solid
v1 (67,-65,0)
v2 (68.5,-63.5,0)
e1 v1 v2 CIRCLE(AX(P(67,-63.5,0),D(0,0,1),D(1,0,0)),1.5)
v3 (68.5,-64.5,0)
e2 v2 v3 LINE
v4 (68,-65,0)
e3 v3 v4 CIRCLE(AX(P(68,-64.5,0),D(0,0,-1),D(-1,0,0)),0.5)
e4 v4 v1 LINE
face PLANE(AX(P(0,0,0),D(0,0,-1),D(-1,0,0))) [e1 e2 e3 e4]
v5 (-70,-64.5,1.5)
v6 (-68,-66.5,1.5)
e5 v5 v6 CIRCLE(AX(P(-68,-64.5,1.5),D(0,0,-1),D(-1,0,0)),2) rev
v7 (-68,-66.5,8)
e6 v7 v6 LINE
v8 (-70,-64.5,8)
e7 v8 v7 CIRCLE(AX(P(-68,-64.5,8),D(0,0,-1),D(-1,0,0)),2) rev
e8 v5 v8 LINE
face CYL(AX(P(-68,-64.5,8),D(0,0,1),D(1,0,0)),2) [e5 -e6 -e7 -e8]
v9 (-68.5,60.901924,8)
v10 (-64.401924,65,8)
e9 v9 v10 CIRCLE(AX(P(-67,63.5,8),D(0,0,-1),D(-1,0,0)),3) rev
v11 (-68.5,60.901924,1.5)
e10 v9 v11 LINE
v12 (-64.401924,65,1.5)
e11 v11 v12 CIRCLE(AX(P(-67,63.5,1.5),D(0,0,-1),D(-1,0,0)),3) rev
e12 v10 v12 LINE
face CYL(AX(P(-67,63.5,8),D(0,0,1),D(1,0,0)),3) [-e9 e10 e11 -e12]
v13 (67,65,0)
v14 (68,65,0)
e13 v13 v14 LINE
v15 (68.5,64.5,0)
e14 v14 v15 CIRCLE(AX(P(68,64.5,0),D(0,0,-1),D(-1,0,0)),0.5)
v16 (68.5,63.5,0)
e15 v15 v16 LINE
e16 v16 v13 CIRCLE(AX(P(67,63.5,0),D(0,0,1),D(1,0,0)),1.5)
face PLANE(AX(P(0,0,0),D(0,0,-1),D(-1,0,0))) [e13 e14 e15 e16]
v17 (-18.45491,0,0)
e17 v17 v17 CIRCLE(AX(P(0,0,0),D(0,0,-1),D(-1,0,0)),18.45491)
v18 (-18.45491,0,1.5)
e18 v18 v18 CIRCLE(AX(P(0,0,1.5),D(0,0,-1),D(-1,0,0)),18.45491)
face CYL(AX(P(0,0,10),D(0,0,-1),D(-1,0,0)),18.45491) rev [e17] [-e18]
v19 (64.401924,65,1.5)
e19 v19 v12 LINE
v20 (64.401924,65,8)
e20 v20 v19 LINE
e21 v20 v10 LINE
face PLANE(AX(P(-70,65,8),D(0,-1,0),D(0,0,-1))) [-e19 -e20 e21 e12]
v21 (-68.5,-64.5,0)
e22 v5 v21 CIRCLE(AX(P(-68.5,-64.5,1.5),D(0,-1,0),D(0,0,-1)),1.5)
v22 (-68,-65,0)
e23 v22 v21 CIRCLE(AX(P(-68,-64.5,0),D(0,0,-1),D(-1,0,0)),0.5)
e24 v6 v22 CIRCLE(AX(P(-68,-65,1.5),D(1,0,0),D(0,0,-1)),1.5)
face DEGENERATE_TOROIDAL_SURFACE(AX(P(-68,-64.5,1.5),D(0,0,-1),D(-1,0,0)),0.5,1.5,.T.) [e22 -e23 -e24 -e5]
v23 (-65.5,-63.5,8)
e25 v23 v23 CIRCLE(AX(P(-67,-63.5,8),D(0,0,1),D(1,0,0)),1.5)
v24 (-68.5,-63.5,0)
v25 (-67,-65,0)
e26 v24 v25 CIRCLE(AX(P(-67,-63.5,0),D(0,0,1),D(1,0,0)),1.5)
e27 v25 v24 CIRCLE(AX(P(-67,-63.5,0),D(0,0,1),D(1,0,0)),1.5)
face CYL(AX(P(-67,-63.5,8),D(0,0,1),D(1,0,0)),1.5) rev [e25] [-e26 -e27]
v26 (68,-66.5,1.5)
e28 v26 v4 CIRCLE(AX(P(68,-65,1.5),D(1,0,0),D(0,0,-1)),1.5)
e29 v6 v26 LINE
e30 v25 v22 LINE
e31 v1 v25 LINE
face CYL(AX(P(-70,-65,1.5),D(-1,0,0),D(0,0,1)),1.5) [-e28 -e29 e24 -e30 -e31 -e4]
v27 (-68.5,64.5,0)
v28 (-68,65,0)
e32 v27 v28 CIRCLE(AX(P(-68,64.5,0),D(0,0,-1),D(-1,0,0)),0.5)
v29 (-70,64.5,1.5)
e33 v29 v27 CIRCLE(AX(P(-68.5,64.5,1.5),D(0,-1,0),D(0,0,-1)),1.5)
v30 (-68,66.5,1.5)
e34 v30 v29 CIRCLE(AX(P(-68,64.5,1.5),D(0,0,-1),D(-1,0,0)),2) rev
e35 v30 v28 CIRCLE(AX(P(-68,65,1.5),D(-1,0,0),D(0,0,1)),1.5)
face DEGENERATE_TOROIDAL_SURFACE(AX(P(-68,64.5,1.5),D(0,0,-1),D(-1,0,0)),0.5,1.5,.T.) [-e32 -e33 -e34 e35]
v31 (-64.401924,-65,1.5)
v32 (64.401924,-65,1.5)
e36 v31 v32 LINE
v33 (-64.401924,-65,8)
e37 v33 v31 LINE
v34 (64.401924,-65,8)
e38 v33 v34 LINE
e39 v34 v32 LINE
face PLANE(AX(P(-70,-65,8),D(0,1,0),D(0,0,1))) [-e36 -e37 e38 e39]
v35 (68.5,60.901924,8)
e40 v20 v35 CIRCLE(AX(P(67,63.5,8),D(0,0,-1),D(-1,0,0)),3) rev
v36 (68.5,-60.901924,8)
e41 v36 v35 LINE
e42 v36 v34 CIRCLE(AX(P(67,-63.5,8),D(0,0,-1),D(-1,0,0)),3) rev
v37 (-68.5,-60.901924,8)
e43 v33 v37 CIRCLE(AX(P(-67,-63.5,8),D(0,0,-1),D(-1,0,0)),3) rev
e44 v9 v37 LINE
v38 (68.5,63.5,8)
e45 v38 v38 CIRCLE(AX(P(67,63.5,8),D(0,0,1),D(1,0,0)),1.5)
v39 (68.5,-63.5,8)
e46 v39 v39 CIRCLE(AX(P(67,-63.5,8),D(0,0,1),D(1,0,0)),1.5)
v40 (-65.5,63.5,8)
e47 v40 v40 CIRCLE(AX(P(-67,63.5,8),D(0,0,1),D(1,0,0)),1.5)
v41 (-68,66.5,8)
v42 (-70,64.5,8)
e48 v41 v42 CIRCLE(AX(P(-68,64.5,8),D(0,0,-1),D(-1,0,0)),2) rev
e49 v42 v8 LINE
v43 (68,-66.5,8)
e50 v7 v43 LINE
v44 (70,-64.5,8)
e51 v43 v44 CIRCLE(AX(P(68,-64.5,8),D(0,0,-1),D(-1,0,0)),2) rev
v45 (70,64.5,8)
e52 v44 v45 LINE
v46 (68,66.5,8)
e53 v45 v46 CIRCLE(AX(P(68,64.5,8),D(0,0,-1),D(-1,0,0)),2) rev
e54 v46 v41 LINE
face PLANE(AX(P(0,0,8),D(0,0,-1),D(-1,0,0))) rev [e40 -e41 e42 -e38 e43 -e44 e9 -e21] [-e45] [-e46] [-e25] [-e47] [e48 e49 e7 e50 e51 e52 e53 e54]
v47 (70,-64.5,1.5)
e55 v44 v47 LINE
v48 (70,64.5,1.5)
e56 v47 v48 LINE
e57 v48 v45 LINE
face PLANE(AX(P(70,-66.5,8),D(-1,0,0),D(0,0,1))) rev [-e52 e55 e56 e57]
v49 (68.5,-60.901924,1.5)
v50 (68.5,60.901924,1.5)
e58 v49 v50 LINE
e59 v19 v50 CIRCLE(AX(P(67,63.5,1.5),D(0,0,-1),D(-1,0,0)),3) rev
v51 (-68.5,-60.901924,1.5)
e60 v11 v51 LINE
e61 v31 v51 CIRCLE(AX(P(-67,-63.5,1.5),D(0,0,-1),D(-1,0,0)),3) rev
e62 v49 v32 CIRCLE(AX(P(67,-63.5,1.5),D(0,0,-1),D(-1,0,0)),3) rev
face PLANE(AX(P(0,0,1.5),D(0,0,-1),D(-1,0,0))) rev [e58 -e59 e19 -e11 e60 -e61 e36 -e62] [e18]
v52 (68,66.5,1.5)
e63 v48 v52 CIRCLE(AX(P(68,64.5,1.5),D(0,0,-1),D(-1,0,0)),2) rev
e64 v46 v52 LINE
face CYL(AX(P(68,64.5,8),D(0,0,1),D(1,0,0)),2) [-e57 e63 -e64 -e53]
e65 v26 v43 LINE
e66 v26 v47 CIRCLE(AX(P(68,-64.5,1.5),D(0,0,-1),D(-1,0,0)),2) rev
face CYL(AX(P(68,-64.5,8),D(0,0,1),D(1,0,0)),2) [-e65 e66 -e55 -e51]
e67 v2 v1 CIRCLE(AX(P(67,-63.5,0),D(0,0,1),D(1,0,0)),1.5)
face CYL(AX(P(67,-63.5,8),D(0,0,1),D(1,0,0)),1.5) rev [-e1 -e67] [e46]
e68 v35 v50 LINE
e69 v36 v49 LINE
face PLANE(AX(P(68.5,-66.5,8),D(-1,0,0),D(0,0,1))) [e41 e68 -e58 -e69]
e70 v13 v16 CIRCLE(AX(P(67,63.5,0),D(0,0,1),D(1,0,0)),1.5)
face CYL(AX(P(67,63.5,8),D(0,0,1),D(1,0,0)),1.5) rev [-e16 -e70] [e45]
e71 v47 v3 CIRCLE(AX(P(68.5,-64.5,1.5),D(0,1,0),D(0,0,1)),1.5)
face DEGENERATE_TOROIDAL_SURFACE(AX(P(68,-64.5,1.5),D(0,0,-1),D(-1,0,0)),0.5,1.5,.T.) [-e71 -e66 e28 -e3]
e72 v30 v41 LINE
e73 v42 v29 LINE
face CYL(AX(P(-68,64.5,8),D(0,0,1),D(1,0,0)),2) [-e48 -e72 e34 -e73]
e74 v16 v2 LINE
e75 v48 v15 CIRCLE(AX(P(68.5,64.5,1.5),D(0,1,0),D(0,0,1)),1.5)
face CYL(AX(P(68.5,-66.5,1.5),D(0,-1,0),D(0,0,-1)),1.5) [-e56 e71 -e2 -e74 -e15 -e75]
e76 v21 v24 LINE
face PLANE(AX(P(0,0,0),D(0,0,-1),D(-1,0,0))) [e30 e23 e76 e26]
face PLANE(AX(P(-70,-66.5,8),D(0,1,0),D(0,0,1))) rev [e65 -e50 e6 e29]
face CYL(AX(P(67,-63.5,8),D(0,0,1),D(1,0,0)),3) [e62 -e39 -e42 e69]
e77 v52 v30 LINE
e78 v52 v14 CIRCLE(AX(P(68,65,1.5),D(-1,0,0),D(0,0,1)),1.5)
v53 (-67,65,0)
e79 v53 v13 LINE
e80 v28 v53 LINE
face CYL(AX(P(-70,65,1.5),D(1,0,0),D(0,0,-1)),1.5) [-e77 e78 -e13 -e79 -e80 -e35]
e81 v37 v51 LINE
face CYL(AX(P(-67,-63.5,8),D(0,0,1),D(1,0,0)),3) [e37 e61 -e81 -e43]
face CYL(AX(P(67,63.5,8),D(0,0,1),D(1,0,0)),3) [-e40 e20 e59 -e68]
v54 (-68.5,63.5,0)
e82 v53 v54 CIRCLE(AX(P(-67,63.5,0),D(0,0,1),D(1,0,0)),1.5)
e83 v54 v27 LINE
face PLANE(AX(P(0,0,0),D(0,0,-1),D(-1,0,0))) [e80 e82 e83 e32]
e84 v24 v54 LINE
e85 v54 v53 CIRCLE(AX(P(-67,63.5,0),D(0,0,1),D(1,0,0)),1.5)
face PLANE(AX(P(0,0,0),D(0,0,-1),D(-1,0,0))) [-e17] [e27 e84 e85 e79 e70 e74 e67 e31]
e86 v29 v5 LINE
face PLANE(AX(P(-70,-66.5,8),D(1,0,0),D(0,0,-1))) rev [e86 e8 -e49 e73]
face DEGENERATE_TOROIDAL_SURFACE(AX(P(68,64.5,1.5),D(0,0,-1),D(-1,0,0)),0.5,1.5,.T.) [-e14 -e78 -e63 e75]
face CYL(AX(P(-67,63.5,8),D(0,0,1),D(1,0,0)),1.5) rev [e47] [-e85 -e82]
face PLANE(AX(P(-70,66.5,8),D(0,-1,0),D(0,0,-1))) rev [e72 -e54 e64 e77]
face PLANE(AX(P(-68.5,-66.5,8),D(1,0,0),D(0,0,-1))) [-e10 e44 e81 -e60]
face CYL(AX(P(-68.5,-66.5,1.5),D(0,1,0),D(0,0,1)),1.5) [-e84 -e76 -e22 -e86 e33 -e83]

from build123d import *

# Parameters (mm, degrees)
SKETCH1_W                = 140
SKETCH1_H                = 133
BOSS_EXTRUDE1_DEPTH      = 8
F_3_0_3_DIAMETER_HOLE1_D = 3
SHELL3_T                 = -1.5
FILLET2_R                = 2
FILLET3_R                = 2
FILLET4_R                = 2
FILLET5_R                = 2
SKETCH13_R               = 18.454910332
CUT_EXTRUDE1_DEPTH       = 10
FILLET6_R                = 1.5


with BuildPart() as part:
    # Sketch1 → Boss-Extrude1 (new body)
    with BuildSketch(Plane.XY):
        Rectangle(SKETCH1_W, SKETCH1_H)
    extrude(amount=BOSS_EXTRUDE1_DEPTH)

    # Ø3.0 (3) Diameter Hole1 (through all)
    with Locations(Plane.XY.offset(8)):
        with Locations((-67, 63.5), (67, 63.5), (-67, -63.5), (67, -63.5)):
            Hole(F_3_0_3_DIAMETER_HOLE1_D / 2)

    # Shell3
    shell3_openings = [part.faces().sort_by_distance(p)[0] for p in [
        (0, 0, 8),
    ]]
    offset(amount=SHELL3_T, openings=shell3_openings)

    # Fillet2
    fillet2_edges = [part.edges().sort_by_distance(p)[0] for p in [
        (-70, 66.5, 4),
    ]]
    fillet(fillet2_edges, radius=FILLET2_R)

    # Fillet3
    fillet3_edges = [part.edges().sort_by_distance(p)[0] for p in [
        (-70, -66.5, 4),
    ]]
    fillet(fillet3_edges, radius=FILLET3_R)

    # Fillet4
    fillet4_edges = [part.edges().sort_by_distance(p)[0] for p in [
        (70, -66.5, 4),
    ]]
    fillet(fillet4_edges, radius=FILLET4_R)

    # Fillet5
    fillet5_edges = [part.edges().sort_by_distance(p)[0] for p in [
        (70, 66.5, 4),
    ]]
    fillet(fillet5_edges, radius=FILLET5_R)

    # Sketch13 → Cut-Extrude1 (cut)
    with BuildSketch(Plane(origin=(0, 0, 0), x_dir=(-1, 0, 0), z_dir=(0, 0, -1))):
        Circle(SKETCH13_R)
    extrude(amount=-CUT_EXTRUDE1_DEPTH, mode=Mode.SUBTRACT)

    # Fillet6
    fillet6_edges = [part.edges().sort_by_distance(p)[0] for p in [
        (-70, 0, 0),
        (-69.414213562, 65.914213562, 0),
        (0, -66.5, 0),
        (-69.414213562, -65.914213562, 0),
        (70, 0, 0),
        (69.414213562, -65.914213562, 0),
        (0, 66.5, 0),
        (69.414213562, 65.914213562, 0),
    ]]
    fillet(fillet6_edges, radius=FILLET6_R - 0.0001)  # a hair under: the kernel refuses the full size


solid = part.part
